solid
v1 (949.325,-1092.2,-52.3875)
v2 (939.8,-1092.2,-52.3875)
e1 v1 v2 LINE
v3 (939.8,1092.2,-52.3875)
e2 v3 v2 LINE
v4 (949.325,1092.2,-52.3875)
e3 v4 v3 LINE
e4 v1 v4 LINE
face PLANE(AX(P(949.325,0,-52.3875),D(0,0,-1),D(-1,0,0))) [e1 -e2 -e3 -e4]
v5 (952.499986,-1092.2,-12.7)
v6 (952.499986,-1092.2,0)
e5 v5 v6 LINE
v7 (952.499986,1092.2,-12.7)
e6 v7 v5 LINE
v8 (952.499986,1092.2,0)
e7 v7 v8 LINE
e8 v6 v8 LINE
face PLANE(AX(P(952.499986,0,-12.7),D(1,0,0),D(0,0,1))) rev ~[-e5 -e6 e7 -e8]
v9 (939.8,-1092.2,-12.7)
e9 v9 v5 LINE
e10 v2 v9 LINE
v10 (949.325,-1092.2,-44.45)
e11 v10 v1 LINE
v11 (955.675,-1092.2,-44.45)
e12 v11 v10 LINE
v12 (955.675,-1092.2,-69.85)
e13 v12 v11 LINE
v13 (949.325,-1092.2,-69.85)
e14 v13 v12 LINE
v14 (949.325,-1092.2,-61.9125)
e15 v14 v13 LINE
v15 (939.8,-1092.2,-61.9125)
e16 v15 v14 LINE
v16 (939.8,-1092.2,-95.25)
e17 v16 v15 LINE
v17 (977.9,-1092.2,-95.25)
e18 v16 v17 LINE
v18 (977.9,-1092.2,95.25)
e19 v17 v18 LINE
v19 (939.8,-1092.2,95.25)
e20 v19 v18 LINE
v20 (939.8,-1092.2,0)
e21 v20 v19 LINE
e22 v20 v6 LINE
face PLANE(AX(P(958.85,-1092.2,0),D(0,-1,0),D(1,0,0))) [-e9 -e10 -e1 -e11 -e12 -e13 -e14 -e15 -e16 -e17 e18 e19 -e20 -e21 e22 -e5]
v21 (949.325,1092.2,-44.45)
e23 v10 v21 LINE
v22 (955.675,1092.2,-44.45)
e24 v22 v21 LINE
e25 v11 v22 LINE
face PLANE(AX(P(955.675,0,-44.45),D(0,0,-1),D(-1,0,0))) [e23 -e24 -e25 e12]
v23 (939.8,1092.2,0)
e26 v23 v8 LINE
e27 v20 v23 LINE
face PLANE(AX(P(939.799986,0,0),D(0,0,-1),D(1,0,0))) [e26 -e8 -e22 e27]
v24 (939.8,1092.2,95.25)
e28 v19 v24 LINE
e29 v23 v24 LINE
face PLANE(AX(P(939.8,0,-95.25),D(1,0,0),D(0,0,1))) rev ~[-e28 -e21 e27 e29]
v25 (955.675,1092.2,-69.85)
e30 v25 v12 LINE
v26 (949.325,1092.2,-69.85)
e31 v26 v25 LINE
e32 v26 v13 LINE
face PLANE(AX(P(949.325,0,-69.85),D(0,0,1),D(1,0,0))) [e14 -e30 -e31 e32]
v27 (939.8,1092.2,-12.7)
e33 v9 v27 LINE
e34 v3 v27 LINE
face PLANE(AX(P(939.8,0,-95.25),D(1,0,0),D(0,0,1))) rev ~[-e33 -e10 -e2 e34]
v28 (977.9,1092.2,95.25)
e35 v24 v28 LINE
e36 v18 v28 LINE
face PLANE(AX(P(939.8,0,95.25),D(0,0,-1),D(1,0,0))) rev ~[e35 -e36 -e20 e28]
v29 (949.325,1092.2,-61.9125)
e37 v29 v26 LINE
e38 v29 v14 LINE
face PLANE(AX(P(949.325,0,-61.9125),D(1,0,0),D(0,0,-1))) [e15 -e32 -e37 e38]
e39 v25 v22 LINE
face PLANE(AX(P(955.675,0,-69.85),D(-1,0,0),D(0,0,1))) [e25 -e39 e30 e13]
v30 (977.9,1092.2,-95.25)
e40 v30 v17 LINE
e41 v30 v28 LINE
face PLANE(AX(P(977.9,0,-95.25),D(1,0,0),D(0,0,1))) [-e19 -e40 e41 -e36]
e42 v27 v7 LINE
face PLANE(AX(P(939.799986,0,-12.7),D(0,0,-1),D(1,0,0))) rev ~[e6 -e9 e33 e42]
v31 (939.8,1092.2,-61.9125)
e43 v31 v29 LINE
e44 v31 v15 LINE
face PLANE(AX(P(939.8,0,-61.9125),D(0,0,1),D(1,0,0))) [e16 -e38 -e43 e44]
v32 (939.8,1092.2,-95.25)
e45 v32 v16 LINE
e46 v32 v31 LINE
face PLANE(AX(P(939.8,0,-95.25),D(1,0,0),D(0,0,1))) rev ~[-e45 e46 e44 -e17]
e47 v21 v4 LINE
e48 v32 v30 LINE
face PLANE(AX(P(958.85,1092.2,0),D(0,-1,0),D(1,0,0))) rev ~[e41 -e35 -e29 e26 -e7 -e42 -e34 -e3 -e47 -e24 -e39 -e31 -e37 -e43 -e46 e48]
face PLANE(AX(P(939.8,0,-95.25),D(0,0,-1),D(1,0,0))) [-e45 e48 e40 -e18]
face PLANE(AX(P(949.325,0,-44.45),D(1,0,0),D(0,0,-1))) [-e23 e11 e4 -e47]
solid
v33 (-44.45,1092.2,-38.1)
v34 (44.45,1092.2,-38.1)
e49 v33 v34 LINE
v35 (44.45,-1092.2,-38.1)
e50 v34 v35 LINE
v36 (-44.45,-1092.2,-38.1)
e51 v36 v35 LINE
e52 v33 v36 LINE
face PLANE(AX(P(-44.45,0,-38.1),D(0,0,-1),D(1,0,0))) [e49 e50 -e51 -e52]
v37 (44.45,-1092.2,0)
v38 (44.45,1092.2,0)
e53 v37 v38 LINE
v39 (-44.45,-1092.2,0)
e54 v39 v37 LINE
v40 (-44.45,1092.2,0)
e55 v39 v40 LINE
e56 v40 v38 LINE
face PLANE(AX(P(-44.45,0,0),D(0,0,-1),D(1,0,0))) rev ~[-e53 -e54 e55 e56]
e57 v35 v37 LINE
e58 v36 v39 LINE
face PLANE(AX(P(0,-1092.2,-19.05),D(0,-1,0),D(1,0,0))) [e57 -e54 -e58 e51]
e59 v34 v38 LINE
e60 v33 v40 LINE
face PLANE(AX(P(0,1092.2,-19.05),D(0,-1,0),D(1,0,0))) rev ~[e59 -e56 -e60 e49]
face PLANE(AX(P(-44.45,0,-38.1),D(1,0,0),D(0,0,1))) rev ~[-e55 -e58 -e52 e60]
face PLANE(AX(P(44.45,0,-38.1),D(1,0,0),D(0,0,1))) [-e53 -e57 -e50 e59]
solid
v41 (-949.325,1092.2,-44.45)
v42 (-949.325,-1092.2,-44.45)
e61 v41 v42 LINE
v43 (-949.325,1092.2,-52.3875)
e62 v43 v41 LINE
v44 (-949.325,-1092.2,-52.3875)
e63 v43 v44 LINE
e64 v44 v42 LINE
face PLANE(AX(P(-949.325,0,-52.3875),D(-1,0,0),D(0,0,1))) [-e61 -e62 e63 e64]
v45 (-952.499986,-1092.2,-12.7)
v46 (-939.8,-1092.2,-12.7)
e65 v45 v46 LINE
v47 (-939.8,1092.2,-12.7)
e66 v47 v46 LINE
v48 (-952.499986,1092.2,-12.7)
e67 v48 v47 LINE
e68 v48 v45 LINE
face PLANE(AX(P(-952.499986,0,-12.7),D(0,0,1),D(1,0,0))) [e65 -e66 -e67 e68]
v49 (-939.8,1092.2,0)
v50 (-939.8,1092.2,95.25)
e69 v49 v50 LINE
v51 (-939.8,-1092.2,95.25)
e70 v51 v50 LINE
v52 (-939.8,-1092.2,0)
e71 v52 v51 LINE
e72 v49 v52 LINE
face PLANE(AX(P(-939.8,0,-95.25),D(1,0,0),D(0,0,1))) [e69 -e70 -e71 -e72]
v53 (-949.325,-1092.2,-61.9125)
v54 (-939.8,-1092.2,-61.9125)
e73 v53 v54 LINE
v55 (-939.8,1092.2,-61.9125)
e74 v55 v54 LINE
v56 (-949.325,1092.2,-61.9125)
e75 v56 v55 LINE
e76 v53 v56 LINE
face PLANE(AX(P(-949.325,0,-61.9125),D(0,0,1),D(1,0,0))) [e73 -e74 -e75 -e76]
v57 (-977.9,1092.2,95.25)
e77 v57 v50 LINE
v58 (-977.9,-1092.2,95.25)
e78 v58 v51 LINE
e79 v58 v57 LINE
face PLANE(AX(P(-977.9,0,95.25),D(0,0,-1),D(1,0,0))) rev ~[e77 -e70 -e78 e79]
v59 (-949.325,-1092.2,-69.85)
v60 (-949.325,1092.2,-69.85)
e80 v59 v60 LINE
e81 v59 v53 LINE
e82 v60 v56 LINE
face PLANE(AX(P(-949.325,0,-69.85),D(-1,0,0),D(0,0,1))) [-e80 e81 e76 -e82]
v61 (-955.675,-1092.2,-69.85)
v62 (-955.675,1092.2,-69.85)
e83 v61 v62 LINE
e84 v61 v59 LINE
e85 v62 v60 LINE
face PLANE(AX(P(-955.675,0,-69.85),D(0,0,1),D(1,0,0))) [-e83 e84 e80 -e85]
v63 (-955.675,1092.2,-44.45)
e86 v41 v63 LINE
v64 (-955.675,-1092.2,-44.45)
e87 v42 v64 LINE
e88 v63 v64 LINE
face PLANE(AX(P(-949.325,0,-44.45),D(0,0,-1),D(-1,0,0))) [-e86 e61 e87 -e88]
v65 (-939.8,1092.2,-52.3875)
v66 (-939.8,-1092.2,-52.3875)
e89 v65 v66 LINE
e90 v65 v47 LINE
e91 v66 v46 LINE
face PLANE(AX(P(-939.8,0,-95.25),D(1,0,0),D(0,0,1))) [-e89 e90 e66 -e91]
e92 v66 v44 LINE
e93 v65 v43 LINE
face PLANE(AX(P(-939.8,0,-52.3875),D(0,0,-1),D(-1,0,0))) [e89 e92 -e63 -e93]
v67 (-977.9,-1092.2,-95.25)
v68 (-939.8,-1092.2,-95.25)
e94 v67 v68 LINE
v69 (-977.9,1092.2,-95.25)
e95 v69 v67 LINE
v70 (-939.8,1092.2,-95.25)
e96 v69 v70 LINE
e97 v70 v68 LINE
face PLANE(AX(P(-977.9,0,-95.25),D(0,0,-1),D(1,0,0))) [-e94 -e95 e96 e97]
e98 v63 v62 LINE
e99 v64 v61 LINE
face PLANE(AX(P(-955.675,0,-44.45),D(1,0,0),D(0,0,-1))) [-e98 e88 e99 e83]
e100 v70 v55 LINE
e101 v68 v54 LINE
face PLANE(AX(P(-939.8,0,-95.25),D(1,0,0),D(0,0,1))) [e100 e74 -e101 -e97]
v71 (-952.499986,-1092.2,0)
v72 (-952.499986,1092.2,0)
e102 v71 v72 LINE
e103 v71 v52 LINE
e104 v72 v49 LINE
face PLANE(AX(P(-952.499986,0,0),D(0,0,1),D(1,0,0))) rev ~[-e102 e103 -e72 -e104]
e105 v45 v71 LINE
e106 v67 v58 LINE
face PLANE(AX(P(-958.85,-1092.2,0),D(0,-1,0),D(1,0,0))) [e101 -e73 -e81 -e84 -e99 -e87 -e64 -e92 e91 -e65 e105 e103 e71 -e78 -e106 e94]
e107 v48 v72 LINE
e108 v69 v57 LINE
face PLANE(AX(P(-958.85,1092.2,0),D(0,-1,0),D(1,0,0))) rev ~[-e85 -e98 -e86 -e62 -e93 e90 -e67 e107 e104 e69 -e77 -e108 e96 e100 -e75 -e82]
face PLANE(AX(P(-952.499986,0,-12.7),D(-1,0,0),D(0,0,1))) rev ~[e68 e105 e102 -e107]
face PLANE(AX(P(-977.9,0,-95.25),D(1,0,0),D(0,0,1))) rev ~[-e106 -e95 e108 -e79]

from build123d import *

# Parameters (mm, degrees)
F0_W     = 38.1
F0_H     = 190.5
F1_DEPTH = 1092.2
F0_W_2   = 88.9
F0_H_2   = 38.1
F2_W     = 12.7
F2_H     = 12.7
F3_DEPTH = 1092.2


# Not quite as in the source:
# - a feature names something its author has since deleted; it is built from what else it names


with BuildPart() as f1:
    # F0 (on Front) → F1 (new body, symmetric)
    with BuildSketch(Plane.XZ):
        with Locations((-958.85, 0)):
            Rectangle(F0_W, F0_H)
    extrude(amount=F1_DEPTH, both=True)


with BuildPart() as f1b:
    # F0 (on Front) → F1, piece 2 (new body, symmetric)
    with BuildSketch(Plane.XZ):
        with Locations((958.85, 0)):
            Rectangle(F0_W, F0_H)
    extrude(amount=F1_DEPTH, both=True)


with BuildPart() as f1c:
    # F0 (on Front) → F1, piece 3 (new body, symmetric)
    with BuildSketch(Plane.XZ):
        with Locations((0, -19.05)):
            Rectangle(F0_W_2, F0_H_2)
    extrude(amount=F1_DEPTH, both=True)


with BuildPart() as f3_tool:
    # F2 (on Front) → F3 (new body, symmetric)
    with BuildSketch(Plane.XZ):
        Polygon((-949.325, -61.9125), (-939.8, -61.9125), (-939.8, -57.15), (-955.675, -57.15), (-955.675, -69.85), (-949.325, -69.85), align=None)
        Polygon((-955.675, -57.15), (-939.8, -57.15), (-939.8, -52.3875), (-949.325, -52.3875), (-949.325, -44.45), (-955.675, -44.45), align=None)
        Polygon((949.325, -52.3875), (939.8, -52.3875), (939.8, -57.15), (955.675, -57.15), (955.675, -44.45), (949.325, -44.45), align=None)
        Polygon((955.675, -57.15), (939.8, -57.15), (939.8, -61.9125), (949.325, -61.9125), (949.325, -69.85), (955.675, -69.85), align=None)
        with Locations((-946.1499856949, -6.35)):
            Rectangle(F2_W, F2_H)
        with Locations((946.1499856949, -6.35)):
            Rectangle(F2_W, F2_H)
    extrude(amount=F3_DEPTH, both=True)


with BuildPart() as f1_1:
    add(f1.part)

    # F3: cut by f3_tool
    add(f3_tool.part, mode=Mode.SUBTRACT)


with BuildPart() as f1b_1:
    add(f1b.part)

    # F3: cut by f3_tool
    add(f3_tool.part, mode=Mode.SUBTRACT)


solid = Compound([f1c.part, f1_1.part, f1b_1.part])
